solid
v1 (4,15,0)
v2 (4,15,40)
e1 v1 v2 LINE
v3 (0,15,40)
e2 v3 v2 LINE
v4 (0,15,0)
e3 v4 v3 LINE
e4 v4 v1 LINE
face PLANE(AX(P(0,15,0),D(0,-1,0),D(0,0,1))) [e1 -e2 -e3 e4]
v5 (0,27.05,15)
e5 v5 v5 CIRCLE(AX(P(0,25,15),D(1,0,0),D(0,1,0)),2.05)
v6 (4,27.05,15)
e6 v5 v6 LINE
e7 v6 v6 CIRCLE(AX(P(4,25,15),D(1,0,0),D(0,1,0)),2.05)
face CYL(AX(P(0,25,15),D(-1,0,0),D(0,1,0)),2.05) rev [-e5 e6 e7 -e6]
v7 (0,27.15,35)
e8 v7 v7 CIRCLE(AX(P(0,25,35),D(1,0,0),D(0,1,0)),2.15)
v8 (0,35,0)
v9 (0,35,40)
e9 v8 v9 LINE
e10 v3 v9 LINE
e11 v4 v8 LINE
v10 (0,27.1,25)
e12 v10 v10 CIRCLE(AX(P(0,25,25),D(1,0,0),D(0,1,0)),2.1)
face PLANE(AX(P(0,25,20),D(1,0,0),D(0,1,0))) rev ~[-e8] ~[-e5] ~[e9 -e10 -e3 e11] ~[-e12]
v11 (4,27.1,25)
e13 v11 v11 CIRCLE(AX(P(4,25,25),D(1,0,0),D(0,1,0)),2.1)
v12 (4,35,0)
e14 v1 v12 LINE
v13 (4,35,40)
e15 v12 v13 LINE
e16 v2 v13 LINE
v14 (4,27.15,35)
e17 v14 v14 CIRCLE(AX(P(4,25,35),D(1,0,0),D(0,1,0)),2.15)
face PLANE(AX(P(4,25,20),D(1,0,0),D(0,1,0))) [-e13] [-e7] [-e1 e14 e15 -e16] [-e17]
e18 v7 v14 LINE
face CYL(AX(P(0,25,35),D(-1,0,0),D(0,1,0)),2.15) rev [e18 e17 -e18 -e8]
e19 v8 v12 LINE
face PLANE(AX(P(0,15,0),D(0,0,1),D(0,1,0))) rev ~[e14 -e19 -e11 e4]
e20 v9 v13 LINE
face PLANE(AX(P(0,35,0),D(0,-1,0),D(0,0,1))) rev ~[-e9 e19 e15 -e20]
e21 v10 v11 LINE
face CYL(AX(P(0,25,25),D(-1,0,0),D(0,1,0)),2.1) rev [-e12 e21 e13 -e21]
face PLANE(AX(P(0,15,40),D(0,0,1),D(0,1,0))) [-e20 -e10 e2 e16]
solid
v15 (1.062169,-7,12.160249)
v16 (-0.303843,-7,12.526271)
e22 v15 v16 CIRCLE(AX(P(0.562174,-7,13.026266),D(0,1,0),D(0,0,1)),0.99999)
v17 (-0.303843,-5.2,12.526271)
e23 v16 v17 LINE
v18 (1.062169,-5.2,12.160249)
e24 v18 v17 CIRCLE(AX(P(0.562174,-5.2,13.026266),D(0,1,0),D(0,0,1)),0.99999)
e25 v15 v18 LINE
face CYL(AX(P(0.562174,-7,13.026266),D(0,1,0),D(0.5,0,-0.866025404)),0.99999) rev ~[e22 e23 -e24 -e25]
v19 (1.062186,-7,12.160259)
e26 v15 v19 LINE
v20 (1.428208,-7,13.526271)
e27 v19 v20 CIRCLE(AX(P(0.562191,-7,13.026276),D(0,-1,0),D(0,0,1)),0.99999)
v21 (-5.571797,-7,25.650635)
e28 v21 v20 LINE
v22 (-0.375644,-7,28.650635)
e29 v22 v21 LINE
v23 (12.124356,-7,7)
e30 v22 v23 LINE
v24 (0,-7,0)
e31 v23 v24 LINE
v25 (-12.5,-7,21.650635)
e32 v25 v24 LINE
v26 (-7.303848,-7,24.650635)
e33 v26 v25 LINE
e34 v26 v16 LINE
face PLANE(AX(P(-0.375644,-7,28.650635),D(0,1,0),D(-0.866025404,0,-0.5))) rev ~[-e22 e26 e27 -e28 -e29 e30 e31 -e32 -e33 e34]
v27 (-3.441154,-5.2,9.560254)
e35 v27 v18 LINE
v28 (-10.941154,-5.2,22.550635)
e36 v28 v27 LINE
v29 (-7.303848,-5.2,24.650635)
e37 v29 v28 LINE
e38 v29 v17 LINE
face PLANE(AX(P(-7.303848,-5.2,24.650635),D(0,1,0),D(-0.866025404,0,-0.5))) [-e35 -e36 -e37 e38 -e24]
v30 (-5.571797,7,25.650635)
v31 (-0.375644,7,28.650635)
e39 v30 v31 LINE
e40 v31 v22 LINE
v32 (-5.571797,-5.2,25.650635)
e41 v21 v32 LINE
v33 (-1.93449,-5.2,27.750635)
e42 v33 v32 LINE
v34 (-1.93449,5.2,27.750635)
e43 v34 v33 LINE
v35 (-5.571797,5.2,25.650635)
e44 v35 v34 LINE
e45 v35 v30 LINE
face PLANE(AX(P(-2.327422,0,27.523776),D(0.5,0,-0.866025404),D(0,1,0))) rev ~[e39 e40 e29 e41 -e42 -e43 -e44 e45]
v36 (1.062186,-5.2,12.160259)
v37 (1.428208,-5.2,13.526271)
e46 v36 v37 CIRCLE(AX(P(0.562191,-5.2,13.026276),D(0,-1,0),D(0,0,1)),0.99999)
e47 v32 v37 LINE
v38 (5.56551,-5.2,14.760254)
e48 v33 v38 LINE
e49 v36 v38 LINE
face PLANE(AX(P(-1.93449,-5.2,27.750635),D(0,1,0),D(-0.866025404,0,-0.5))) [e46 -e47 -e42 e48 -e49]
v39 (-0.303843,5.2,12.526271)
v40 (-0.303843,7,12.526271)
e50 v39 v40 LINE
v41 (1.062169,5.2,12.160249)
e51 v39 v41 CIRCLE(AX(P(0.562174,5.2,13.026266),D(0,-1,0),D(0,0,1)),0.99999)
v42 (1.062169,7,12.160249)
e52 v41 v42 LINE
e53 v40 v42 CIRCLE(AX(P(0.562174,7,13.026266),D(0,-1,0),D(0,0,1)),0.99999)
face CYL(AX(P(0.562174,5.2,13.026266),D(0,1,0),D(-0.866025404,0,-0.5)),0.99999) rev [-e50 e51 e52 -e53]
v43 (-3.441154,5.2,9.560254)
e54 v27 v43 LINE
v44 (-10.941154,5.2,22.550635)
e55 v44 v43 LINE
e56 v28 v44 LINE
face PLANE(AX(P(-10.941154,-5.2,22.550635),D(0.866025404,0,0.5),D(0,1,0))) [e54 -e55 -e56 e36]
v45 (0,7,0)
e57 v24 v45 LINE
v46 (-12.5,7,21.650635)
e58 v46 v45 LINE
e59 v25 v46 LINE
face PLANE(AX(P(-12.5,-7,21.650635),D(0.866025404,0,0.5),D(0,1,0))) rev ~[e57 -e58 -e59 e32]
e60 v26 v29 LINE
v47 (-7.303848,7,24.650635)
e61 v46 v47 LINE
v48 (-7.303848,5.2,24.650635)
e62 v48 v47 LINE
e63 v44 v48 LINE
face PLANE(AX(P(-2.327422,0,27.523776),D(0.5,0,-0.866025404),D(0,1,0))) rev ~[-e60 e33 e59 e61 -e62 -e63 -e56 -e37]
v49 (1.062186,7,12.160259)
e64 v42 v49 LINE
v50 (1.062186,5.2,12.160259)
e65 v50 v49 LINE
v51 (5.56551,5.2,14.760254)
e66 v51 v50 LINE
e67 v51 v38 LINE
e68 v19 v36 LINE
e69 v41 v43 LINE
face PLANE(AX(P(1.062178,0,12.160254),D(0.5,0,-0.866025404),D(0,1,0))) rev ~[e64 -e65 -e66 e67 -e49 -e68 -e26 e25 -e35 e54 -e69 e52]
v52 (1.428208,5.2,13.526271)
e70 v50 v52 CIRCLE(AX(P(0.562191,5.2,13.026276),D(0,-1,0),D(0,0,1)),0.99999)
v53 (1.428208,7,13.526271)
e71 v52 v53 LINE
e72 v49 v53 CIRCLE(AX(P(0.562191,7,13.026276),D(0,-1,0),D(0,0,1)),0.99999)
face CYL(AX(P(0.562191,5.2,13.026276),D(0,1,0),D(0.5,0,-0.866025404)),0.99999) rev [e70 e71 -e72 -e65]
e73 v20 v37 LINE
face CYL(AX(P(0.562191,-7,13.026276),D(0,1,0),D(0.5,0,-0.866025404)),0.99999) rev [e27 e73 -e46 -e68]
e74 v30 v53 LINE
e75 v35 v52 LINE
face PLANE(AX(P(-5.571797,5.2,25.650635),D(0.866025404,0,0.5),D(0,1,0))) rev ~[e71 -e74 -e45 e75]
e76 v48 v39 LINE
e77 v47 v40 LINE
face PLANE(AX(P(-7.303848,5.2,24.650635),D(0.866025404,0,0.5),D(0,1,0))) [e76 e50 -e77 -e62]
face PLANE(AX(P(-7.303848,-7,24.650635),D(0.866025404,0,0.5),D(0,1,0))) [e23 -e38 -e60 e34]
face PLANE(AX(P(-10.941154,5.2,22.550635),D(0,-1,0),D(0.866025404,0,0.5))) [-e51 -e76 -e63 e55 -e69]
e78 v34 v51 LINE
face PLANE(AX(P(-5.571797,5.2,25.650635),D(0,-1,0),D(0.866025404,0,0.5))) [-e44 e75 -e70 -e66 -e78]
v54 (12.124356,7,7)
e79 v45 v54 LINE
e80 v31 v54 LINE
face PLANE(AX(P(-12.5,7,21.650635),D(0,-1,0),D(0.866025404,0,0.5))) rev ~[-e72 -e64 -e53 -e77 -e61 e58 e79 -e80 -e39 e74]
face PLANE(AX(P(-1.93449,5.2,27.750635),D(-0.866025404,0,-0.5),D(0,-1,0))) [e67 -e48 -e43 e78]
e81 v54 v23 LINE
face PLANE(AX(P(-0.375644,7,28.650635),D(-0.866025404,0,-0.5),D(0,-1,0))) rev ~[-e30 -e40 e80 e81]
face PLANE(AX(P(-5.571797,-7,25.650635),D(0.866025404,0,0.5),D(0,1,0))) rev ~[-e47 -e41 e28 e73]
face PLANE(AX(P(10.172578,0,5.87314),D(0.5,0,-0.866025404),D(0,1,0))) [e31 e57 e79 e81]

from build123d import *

# Parameters (mm, degrees)
F0_W     = 1.8
F0_H     = 2
F1_DEPTH = 25
F0_W_2   = 20
F0_H_2   = 40
F0_R     = 2.05
F0_R_2   = 2.1
F0_R_3   = 2.15
F2_DEPTH = 4
F3_DEPTH = 15
F4_ANGLE = -60
F6_R     = 0.99999


# Not quite as in the source:
# - a fillet or chamfer is up to 0.001 mm smaller than in the source, because OpenCascade refuses the exact size


with BuildPart() as f1:
    # F0 (on Right) → F1 (new body)
    with BuildSketch(Plane.YZ):
        Polygon((7, 8), (7, 14), (-7, 14), (-7, 8), (-5.2, 8), (-5.2, 12.2), (5.2, 12.2), (5.2, 8), align=None)
        Polygon((7, 0), (7, 6), (5.2, 6), (5.2, 1.8), (-5.2, 1.8), (-5.2, 6), (-7, 6), (-7, 0), align=None)
        with Locations((6.1, 7)):
            Rectangle(F0_W, F0_H)
        Polygon((5.2, 6), (5.2, 8), (5.2, 12.2), (-5.2, 12.2), (-5.2, 8), (-5.2, 6), (-5.2, 1.8), (5.2, 1.8), align=None)
        with Locations((-6.1, 7)):
            Rectangle(F0_W, F0_H)
    extrude(amount=F1_DEPTH)

    # F0 (on Right) → F3 (cut)
    with BuildSketch(Plane.YZ):
        Polygon((5.2, 6), (5.2, 8), (5.2, 12.2), (-5.2, 12.2), (-5.2, 8), (-5.2, 6), (-5.2, 1.8), (5.2, 1.8), align=None)
        with Locations((6.1, 7)):
            Rectangle(F0_W, F0_H)
        with Locations((-6.1, 7)):
            Rectangle(F0_W, F0_H)
    extrude(amount=F3_DEPTH, mode=Mode.SUBTRACT)


with BuildPart() as f2:
    # F0 (on Right) → F2 (new body)
    with BuildSketch(Plane.YZ):
        with Locations((25, 20)):
            Rectangle(F0_W_2, F0_H_2)
        with Locations((25, 15)):
            Circle(F0_R, mode=Mode.SUBTRACT)
        with Locations((25, 25)):
            Circle(F0_R_2, mode=Mode.SUBTRACT)
        with Locations((25, 35)):
            Circle(F0_R_3, mode=Mode.SUBTRACT)
    extrude(amount=F2_DEPTH)


with BuildPart() as f1_1:
    # F4: moved
    add(f1.part.rotate(Axis((25, 0, 0), (0, -1, 0)), F4_ANGLE))


with BuildPart() as f1_2:
    # F5: moved
    add(f1_1.part.moved(Location((-25, 0, 0))))

    # F6 (radius 1 in the source; OpenCascade refuses exactly that, so slightly less here)
    f6_edges = [f1_2.edges().sort_by_distance(p)[0] for p in [
        (1.928203, -6.1, 12.660254),
        (0.196152, -6.1, 11.660254),
        (1.928203, 6.1, 12.660254),
        (0.196152, 6.1, 11.660254),
    ]]
    fillet(f6_edges, radius=F6_R)


solid = Compound([f2.part, f1_2.part])
